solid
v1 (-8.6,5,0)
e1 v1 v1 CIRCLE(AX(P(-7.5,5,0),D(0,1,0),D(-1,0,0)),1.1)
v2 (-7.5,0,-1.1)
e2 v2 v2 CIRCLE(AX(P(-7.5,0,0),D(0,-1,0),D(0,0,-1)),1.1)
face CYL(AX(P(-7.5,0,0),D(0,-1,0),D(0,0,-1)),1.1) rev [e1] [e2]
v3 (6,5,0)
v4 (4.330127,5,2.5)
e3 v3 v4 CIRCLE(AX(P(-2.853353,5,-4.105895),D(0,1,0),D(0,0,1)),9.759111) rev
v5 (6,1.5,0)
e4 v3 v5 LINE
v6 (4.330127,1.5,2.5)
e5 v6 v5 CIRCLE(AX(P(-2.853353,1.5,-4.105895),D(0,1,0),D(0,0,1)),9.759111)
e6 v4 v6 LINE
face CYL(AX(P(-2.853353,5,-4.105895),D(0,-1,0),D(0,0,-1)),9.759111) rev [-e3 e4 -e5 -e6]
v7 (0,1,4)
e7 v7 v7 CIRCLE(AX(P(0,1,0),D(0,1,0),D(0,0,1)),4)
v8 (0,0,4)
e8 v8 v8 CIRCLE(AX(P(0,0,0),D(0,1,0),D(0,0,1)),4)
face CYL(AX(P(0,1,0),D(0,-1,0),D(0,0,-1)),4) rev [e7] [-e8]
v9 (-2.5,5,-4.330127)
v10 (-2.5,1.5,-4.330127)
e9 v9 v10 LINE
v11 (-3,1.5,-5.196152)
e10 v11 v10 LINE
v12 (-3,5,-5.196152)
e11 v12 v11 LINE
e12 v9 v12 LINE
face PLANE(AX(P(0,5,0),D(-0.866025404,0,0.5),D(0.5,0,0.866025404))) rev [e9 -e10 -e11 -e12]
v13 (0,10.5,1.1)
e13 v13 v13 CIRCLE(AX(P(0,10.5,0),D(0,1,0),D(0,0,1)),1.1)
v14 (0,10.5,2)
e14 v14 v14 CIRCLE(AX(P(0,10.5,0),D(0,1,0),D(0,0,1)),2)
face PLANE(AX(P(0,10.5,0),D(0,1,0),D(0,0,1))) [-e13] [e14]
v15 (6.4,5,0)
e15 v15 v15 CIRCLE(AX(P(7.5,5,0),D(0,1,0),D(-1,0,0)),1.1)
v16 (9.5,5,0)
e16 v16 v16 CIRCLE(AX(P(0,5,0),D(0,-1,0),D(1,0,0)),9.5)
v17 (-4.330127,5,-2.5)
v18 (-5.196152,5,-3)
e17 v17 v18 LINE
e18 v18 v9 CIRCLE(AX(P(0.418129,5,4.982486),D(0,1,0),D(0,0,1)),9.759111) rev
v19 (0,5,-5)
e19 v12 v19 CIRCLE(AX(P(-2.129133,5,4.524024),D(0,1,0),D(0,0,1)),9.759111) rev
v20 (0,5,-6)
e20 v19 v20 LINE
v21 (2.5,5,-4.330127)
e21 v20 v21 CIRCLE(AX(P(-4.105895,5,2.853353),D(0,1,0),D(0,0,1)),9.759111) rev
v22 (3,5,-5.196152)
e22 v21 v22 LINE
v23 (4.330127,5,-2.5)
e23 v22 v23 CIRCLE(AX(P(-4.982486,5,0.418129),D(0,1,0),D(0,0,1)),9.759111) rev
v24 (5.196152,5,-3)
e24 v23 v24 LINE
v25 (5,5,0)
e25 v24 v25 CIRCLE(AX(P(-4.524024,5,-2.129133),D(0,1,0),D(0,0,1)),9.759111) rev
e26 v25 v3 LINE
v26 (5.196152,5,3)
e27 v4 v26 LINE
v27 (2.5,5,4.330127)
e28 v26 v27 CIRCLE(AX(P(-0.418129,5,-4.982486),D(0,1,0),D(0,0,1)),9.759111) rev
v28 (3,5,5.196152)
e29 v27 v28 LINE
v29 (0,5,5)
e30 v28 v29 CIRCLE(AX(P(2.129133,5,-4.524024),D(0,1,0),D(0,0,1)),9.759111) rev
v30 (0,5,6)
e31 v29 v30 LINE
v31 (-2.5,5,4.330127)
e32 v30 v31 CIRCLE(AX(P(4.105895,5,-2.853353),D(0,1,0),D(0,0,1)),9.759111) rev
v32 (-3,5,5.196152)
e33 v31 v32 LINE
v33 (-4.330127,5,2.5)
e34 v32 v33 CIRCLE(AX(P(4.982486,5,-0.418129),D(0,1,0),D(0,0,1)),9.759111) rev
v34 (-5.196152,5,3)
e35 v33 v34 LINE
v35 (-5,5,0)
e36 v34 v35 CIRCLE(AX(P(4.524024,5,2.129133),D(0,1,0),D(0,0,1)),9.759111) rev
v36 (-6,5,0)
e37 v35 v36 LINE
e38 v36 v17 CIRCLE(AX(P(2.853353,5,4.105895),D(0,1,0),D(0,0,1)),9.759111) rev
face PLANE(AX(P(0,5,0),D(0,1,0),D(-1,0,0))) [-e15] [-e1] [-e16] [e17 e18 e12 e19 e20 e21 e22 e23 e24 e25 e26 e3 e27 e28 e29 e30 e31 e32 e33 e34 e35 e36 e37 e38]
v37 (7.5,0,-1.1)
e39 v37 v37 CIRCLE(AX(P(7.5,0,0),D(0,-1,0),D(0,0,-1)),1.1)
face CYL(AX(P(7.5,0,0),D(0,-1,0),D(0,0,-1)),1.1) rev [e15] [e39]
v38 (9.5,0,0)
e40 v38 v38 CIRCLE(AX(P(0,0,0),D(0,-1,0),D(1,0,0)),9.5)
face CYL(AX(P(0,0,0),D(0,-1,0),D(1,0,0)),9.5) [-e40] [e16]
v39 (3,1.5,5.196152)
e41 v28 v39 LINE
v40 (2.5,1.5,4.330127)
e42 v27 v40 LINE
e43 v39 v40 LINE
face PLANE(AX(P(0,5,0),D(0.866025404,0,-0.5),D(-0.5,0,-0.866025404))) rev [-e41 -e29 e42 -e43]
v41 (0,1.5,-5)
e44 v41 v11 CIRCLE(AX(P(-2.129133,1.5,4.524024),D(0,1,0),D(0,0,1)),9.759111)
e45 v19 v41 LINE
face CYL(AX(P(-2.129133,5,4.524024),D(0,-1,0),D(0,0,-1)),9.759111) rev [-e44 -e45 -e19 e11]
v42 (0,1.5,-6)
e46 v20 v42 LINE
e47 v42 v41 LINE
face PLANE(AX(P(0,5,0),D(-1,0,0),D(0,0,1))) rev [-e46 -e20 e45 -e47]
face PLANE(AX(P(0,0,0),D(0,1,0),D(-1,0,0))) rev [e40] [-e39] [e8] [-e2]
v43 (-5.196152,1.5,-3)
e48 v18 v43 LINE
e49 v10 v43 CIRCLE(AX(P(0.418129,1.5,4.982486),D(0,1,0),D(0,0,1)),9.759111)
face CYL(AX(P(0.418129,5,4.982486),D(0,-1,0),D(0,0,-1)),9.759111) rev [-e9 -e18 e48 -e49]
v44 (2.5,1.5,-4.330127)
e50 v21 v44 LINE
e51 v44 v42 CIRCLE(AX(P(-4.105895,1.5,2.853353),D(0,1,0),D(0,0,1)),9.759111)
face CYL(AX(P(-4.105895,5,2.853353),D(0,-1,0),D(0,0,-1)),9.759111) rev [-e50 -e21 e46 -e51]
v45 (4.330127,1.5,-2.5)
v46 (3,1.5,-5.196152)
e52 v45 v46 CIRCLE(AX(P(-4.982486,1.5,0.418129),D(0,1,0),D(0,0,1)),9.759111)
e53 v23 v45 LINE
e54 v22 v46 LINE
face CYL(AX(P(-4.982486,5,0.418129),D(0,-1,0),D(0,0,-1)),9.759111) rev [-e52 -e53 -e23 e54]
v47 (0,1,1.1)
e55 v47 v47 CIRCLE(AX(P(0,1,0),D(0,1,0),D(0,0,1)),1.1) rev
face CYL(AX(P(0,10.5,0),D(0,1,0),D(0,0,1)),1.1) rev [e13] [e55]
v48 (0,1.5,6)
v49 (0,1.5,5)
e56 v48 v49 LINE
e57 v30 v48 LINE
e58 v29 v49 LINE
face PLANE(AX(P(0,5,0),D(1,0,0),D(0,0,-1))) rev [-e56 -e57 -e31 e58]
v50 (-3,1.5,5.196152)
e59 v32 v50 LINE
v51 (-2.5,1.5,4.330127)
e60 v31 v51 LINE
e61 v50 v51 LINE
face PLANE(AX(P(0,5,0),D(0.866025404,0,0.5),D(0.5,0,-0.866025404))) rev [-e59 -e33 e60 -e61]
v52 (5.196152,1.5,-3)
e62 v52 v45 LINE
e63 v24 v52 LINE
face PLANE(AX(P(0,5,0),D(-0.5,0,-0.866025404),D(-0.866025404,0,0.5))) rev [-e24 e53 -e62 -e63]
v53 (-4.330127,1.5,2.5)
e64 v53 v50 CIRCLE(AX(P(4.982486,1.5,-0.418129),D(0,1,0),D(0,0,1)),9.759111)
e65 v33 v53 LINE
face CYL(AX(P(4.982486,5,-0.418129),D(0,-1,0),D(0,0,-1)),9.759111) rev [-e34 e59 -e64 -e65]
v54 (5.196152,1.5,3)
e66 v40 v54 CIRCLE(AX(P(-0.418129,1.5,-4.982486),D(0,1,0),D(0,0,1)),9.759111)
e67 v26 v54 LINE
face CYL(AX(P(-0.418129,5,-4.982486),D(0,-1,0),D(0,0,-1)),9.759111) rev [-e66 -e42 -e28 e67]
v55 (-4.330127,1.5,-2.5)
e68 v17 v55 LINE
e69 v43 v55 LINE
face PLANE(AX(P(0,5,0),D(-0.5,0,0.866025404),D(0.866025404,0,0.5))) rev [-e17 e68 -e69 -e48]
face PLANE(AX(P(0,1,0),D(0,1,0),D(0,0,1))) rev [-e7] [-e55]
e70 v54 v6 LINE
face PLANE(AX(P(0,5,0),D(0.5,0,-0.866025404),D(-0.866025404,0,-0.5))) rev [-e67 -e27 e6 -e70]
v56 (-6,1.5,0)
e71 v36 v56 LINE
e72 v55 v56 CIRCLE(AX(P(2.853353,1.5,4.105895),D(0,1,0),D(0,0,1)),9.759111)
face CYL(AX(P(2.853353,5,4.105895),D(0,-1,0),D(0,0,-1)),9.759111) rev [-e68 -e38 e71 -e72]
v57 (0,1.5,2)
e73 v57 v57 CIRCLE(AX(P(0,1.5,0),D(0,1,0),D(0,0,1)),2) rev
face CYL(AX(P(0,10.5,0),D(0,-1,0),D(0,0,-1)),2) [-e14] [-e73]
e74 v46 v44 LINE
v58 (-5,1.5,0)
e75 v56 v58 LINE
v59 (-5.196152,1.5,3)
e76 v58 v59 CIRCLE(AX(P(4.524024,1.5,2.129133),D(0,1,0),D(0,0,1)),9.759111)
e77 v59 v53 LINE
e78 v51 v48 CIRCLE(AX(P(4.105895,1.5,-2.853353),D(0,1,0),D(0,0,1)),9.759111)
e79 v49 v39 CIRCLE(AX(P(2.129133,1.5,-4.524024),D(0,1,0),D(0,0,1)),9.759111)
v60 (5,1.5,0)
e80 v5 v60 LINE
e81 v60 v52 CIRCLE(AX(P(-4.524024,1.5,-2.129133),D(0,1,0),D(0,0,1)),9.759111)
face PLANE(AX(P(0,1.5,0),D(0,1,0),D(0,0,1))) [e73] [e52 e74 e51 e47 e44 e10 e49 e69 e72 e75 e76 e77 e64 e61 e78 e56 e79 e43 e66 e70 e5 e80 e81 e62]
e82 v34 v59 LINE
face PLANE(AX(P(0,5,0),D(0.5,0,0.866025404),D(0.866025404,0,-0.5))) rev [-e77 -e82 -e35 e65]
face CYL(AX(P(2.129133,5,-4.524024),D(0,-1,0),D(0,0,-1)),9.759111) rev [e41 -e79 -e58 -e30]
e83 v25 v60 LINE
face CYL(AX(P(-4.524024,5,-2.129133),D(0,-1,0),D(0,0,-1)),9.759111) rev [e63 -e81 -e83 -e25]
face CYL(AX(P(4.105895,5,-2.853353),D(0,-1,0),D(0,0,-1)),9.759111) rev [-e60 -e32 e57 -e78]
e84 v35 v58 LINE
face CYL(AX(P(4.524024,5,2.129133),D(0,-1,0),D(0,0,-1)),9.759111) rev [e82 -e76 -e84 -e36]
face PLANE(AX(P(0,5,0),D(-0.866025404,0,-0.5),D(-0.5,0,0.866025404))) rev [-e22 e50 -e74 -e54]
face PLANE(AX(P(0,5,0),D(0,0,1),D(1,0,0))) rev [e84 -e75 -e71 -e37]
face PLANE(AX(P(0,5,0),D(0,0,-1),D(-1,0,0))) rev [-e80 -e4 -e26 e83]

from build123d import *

# Parameters (mm, degrees)
SIDE_PROFILE_RATCHETING_PULLEY_MASTERMOD_W = 7.5
SIDE_PROFILE_RATCHETING_PULLEY_MASTERMOD_H = 5
RATCHETING_START                           = 1.5
RATCHETING_PULLEY_MASTERMODEL_OUTLINE_R    = 6
RATCHETING_PULLEY_MASTERMODEL_OUTLINE_R_2  = 2
RATCHETING_PULLEY_MASTERMODEL_DEPTH        = 3.5
M2_CLEARANCE_HOLE2_D                       = 2.2
BOSS_EXTRUDE2_DEPTH                        = 5
BOSS_EXTRUDE1_START                        = 10.5
BOTTOM_PULLEY_RATCHETING_PULLEY_MASTERMO_R = 2
BOSS_EXTRUDE1_DEPTH                        = 10.5
M2_CLEARANCE_HOLE3_D                       = 2.2
BOTTOM_PULLEY_RATCHETING_PULLEY_MAST_2_R   = 4
CUT_EXTRUDE3_DEPTH                         = 1


# Read off the part's stored shape, not the designer's step: ratcheting pulley mastermodel
with BuildPart() as part:
    # side profile-ratcheting pulley mastermod → Revolve1 (revolve)
    with BuildSketch(Plane.XY, mode=Mode.PRIVATE) as revolve1_sk:
        with Locations((-5.75, 2.5)):
            Rectangle(SIDE_PROFILE_RATCHETING_PULLEY_MASTERMOD_W, SIDE_PROFILE_RATCHETING_PULLEY_MASTERMOD_H)
        with Locations((5.75, 2.5)):
            Rectangle(SIDE_PROFILE_RATCHETING_PULLEY_MASTERMOD_W, SIDE_PROFILE_RATCHETING_PULLEY_MASTERMOD_H)
    revolve(revolve1_sk.sketch.rotate(Axis((0, 0, 0), (0, 1, 0)), 180), axis=Axis((0, 0, 0), (0, 1, 0)))

    # ratcheting pulley mastermodel outline → ratcheting pulley mastermodel (cut)
    with BuildSketch(Plane(origin=(0, 0, 0), x_dir=(1, 0, 0), z_dir=(0, 1, 0)).offset(RATCHETING_START)):
        Circle(RATCHETING_PULLEY_MASTERMODEL_OUTLINE_R)
        Circle(RATCHETING_PULLEY_MASTERMODEL_OUTLINE_R_2, mode=Mode.SUBTRACT)
    extrude(amount=RATCHETING_PULLEY_MASTERMODEL_DEPTH, mode=Mode.SUBTRACT)

    # M2 Clearance Hole2 (through all)
    with Locations(Plane(origin=(0, 0, 0), x_dir=(-1, 0, 0), z_dir=(0, -1, 0))):
        with Locations((-7.5, 0), (7.5, 0)):
            Hole(M2_CLEARANCE_HOLE2_D / 2)

    # ratchet profile-ratcheting pulley master → Boss-Extrude2 (add)
    with BuildSketch(Plane(origin=(0, 0, 0), x_dir=(1, 0, 0), z_dir=(0, 1, 0))):
        with BuildLine():
            ThreePointArc((-3, 5.196152423), (-1.492401284, 5.214292716), (0, 5))
            Line((0, 5), (0, 6))
            ThreePointArc((0, 6), (-1.552914271, 5.795554958), (-3, 5.196152423))
        make_face()
        with BuildLine():
            ThreePointArc((0, 6), (1.314688934, 5.261910597), (2.5, 4.330127019))
            Line((2.5, 4.330127019), (3, 5.196152423))
            ThreePointArc((3, 5.196152423), (1.552914271, 5.795554958), (0, 6))
        make_face()
        with BuildLine():
            ThreePointArc((3, 5.196152423), (3.769509313, 3.899603782), (4.330127019, 2.5))
            Line((4.330127019, 2.5), (5.196152423, 3))
            ThreePointArc((5.196152423, 3), (4.242640687, 4.242640687), (3, 5.196152423))
        make_face()
        with BuildLine():
            ThreePointArc((5.196152423, 3), (5.214292716, 1.492401284), (5, 0))
            Line((5, 0), (6, 0))
            ThreePointArc((6, 0), (5.795554958, 1.552914271), (5.196152423, 3))
        make_face()
        with BuildLine():
            ThreePointArc((6, 0), (5.261910597, -1.314688934), (4.330127019, -2.5))
            Line((4.330127019, -2.5), (5.196152423, -3))
            ThreePointArc((5.196152423, -3), (5.795554958, -1.552914271), (6, 0))
        make_face()
        with BuildLine():
            ThreePointArc((5.196152423, -3), (3.899603782, -3.769509313), (2.5, -4.330127019))
            Line((2.5, -4.330127019), (3, -5.196152423))
            ThreePointArc((3, -5.196152423), (4.242640687, -4.242640687), (5.196152423, -3))
        make_face()
        with BuildLine():
            ThreePointArc((3, -5.196152423), (1.492401284, -5.214292716), (0, -5))
            Line((0, -5), (0, -6))
            ThreePointArc((0, -6), (1.552914271, -5.795554958), (3, -5.196152423))
        make_face()
        with BuildLine():
            ThreePointArc((0, -6), (-1.314688934, -5.261910597), (-2.5, -4.330127019))
            Line((-2.5, -4.330127019), (-3, -5.196152423))
            ThreePointArc((-3, -5.196152423), (-1.552914271, -5.795554958), (0, -6))
        make_face()
        with BuildLine():
            ThreePointArc((-3, -5.196152423), (-3.769509313, -3.899603782), (-4.330127019, -2.5))
            Line((-4.330127019, -2.5), (-5.196152423, -3))
            ThreePointArc((-5.196152423, -3), (-4.242640687, -4.242640687), (-3, -5.196152423))
        make_face()
        with BuildLine():
            ThreePointArc((-5.196152423, -3), (-5.214292716, -1.492401284), (-5, 0))
            Line((-5, 0), (-6, 0))
            ThreePointArc((-6, 0), (-5.795554958, -1.552914271), (-5.196152423, -3))
        make_face()
        with BuildLine():
            ThreePointArc((-6, 0), (-5.261910597, 1.314688934), (-4.330127019, 2.5))
            Line((-4.330127019, 2.5), (-5.196152423, 3))
            ThreePointArc((-5.196152423, 3), (-5.795554958, 1.552914271), (-6, 0))
        make_face()
        with BuildLine():
            ThreePointArc((-5.196152423, 3), (-3.899603782, 3.769509313), (-2.5, 4.330127019))
            Line((-2.5, 4.330127019), (-3, 5.196152423))
            ThreePointArc((-3, 5.196152423), (-4.242640687, 4.242640687), (-5.196152423, 3))
        make_face()
    extrude(amount=BOSS_EXTRUDE2_DEPTH)

    # bottom pulley-ratcheting pulley mastermo → Boss-Extrude1 (add)
    with BuildSketch(Plane(origin=(0, 0, 0), x_dir=(1, 0, 0), z_dir=(0, 1, 0)).offset(BOSS_EXTRUDE1_START)):
        with Locations(Location((0, 0, 0), (0, 0, 270))):
            Circle(BOTTOM_PULLEY_RATCHETING_PULLEY_MASTERMO_R)
    extrude(amount=-BOSS_EXTRUDE1_DEPTH)

    # M2 Clearance Hole3 (through all)
    with Locations(Plane(origin=(0, 10.5, 0), x_dir=(1, 0, 0), z_dir=(0, 1, 0))):
        with Locations((0, 0)):
            Hole(M2_CLEARANCE_HOLE3_D / 2)

    # bottom pulley-ratcheting pulley mast 2 → Cut-Extrude3 (cut)
    with BuildSketch(Plane(origin=(0, 0, 0), x_dir=(1, 0, 0), z_dir=(0, 1, 0))):
        with Locations(Location((0, 0, 0), (0, 0, 270))):
            Circle(BOTTOM_PULLEY_RATCHETING_PULLEY_MAST_2_R)
    extrude(amount=CUT_EXTRUDE3_DEPTH, mode=Mode.SUBTRACT)


solid = part.part
